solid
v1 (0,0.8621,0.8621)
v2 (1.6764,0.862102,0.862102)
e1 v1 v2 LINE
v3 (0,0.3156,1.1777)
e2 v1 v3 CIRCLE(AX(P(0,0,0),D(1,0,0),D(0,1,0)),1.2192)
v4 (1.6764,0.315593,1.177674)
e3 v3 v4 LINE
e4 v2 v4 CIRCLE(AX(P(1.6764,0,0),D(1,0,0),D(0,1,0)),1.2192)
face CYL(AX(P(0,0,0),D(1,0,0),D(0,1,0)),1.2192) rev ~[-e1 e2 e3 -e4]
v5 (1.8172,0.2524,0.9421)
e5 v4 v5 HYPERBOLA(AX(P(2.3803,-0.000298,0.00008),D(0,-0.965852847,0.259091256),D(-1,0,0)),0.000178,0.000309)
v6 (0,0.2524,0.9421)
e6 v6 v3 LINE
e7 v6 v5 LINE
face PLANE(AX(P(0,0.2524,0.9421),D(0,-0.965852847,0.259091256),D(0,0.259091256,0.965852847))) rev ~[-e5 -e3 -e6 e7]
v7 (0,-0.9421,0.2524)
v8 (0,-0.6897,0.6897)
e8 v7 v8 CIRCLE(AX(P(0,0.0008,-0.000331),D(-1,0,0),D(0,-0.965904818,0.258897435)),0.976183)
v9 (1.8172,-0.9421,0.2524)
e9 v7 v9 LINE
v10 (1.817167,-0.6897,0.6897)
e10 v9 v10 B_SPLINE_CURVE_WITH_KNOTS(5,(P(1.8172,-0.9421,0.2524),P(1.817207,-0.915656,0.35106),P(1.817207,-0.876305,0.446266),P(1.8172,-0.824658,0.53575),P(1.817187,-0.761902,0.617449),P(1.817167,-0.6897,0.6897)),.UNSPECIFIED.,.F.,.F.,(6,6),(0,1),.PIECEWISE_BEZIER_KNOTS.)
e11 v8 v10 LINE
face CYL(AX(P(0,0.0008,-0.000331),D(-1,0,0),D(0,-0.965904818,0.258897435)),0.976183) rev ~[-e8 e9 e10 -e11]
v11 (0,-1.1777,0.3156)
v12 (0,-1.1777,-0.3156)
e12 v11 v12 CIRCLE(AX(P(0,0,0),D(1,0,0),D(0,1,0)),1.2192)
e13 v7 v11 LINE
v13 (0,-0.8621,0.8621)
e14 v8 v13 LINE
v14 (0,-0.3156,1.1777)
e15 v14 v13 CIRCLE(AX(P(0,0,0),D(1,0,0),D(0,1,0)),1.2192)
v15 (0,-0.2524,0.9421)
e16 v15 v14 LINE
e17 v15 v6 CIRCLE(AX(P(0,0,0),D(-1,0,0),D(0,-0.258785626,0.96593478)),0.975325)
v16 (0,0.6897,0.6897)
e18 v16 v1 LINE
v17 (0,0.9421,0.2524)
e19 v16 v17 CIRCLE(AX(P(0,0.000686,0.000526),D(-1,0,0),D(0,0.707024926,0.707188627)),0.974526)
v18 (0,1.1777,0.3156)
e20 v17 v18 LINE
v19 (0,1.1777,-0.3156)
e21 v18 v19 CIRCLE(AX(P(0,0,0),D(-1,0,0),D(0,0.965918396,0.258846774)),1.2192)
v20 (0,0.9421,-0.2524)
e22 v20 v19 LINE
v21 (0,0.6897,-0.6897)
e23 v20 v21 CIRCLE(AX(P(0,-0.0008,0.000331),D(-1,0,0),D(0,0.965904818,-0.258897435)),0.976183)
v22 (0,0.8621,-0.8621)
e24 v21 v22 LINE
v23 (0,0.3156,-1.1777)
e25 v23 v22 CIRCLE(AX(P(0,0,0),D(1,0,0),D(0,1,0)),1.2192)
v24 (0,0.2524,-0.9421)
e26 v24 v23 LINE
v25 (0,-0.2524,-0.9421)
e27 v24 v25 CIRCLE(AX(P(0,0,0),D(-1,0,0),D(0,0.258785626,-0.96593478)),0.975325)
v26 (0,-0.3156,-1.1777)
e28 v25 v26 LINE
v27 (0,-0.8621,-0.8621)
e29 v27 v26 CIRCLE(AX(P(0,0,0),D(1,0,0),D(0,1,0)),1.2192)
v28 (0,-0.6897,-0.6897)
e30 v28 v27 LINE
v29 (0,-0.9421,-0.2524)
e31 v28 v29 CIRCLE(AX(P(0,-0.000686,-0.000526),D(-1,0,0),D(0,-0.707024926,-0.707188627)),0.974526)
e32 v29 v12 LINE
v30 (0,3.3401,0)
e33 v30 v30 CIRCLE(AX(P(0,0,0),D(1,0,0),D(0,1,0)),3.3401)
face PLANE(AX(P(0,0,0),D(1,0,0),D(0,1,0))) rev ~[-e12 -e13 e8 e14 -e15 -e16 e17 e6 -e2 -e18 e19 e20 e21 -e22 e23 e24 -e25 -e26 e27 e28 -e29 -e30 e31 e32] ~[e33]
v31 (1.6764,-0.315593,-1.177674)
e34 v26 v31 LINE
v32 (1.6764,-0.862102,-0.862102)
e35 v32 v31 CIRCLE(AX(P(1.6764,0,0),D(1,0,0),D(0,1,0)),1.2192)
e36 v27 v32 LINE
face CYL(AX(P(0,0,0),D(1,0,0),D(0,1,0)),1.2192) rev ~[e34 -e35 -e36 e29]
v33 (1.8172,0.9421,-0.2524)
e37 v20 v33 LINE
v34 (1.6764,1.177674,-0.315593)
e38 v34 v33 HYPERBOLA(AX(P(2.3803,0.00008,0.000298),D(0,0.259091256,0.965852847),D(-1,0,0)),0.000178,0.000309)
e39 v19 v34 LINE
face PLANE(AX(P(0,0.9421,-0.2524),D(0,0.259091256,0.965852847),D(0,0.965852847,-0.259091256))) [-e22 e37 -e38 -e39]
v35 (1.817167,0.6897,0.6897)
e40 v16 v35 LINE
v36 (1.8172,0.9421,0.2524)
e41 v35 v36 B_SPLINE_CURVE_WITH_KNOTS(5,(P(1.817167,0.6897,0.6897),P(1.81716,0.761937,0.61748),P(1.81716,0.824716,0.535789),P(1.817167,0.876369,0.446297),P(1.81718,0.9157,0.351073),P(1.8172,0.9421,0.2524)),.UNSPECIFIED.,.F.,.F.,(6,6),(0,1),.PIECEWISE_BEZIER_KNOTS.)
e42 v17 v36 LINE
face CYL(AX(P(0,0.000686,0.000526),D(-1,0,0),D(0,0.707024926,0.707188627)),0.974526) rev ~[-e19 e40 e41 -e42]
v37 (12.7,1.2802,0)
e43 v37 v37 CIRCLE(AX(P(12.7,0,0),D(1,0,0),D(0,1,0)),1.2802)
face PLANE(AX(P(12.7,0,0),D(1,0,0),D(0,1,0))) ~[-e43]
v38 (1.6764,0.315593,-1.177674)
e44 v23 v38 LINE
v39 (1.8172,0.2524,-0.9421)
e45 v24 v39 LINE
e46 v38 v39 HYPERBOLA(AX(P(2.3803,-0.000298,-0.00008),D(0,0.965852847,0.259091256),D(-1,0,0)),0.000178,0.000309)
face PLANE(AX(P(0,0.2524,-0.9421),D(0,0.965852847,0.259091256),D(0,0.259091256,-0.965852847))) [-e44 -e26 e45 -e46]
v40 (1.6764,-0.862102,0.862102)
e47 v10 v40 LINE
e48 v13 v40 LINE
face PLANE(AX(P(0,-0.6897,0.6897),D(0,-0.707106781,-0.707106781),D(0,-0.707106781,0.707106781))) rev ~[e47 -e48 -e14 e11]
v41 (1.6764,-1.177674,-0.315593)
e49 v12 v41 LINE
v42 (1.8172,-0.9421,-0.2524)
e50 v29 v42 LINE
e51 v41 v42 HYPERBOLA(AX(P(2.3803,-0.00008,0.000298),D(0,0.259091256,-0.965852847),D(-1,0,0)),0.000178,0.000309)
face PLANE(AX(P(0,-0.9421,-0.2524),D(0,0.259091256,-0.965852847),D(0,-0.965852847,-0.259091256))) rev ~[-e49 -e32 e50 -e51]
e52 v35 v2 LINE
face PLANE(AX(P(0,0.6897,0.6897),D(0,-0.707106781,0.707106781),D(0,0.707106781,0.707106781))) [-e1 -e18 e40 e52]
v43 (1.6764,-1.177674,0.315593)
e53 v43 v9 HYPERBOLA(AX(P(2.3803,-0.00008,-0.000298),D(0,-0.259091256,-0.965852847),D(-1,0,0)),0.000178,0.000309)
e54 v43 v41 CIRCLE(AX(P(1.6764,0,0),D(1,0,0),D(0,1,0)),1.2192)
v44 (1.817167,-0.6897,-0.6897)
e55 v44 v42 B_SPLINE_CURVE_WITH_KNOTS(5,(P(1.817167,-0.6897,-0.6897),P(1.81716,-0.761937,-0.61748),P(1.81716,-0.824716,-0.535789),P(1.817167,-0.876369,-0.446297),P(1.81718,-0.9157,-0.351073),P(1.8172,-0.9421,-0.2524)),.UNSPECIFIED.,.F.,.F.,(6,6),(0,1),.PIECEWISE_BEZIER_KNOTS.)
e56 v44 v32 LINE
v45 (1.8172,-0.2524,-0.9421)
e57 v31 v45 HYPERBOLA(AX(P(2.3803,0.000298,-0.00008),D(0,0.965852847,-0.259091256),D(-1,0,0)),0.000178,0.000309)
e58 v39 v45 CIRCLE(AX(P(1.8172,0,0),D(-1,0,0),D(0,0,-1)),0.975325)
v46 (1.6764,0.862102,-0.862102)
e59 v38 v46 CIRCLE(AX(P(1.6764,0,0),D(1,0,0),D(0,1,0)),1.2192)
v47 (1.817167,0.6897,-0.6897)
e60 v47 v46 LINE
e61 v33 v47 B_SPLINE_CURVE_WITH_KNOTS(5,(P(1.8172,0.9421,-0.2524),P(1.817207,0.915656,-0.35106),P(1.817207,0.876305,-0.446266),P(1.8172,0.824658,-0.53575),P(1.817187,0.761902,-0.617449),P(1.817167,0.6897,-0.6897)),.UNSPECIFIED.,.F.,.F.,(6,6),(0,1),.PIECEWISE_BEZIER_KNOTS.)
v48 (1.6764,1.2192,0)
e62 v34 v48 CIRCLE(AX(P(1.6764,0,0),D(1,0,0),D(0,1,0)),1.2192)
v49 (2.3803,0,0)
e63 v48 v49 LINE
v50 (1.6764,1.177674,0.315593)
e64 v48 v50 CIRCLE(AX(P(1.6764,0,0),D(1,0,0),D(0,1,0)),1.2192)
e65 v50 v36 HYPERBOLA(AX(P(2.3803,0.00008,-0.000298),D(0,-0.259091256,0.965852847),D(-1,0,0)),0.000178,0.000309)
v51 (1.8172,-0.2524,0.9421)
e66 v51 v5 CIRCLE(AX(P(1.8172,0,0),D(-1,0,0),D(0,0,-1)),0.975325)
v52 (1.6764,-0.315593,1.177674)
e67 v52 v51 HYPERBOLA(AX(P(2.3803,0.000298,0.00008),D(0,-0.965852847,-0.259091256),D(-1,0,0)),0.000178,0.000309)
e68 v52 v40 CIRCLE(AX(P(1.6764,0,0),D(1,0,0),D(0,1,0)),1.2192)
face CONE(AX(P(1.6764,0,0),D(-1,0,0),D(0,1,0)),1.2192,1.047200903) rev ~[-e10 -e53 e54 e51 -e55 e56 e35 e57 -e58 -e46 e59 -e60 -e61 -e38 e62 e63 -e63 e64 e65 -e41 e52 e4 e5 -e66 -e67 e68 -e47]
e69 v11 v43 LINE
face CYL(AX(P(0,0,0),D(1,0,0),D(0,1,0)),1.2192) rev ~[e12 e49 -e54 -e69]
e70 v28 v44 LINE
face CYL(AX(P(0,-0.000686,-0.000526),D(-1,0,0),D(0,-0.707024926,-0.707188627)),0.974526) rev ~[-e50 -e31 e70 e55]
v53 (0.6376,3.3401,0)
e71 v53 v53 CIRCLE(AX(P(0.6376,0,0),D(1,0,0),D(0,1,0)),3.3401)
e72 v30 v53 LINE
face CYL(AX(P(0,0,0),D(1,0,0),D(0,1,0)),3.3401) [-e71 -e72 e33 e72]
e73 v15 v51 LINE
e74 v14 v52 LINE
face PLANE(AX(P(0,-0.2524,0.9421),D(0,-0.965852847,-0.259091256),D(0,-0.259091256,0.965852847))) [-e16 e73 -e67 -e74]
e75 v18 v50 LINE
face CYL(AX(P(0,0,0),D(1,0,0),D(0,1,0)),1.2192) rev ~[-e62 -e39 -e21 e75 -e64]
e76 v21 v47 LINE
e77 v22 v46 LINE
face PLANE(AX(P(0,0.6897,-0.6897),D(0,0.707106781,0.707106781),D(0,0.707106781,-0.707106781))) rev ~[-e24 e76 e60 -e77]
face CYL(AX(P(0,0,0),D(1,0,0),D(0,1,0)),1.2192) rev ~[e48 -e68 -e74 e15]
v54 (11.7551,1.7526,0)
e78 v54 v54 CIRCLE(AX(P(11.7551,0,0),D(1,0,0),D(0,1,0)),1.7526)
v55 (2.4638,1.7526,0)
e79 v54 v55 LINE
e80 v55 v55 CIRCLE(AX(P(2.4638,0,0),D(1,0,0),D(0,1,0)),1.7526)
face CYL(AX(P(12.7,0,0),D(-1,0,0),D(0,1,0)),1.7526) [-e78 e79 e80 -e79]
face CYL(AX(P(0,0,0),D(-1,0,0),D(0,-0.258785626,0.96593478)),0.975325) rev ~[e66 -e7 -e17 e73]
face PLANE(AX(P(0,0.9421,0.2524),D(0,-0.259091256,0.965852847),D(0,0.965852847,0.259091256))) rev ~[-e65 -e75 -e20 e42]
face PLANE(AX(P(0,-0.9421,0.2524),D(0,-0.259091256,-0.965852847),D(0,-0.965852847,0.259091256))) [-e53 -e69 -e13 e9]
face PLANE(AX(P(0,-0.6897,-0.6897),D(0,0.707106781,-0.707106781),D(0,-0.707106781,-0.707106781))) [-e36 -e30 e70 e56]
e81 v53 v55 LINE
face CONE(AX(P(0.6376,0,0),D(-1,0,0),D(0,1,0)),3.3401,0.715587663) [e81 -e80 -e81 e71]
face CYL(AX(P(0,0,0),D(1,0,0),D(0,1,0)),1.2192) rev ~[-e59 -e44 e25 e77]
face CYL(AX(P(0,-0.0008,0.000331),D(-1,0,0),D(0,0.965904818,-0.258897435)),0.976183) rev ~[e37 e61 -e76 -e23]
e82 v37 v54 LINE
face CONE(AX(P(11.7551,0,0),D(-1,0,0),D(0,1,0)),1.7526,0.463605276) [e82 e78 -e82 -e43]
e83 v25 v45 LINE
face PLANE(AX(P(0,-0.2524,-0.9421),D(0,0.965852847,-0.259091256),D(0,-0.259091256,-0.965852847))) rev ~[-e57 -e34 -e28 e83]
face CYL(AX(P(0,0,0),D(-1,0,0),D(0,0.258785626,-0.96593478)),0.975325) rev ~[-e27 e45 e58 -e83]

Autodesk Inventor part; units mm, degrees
ref_plane "YZ Plane" through (0, 0, 0) normal (1, 0, 0) x (0, 1, 0)
ref_plane "XZ Plane" through (0, 0, 0) normal (0, 1, 0) x (-1, 0, 0)
sketch "Sketch1" plane through (0, 0, 0) normal (0, 0, 1) x (1, 0, 0)
  line L0 (12.7, 0) -> (12.7, 1.7526)
  line L1 (12.7, 1.7526) -> (2.4638, 1.7526)
  line L2 (0, 3.3401) -> (0, 1.2192)
  line L3 (0, 1.2192) -> (1.6764, 1.2192)
  line L4 (1.6764, 1.2192) -> (2.3803, 0)
  line L5 (2.3803, 0) -> (12.7, 0)
  line L6 (0, 3.3401) -> (0.6376, 3.3401)
  line L7 (0.6376, 3.3401) -> (2.4638, 1.7526)
  line L8 (-2.54, 0) -> (15.24, 0) projected
  line L9 (0, -0.668) -> (0, 4.0081) projected
  dimension "d0" = 12.7
  dimension "d1" = 1.6764
  dimension "d2" = 3.5052
  dimension "d3" = 2.4638
  dimension "d4" = 41
  dimension "d5" = 2.4384
  dimension "d6" = 60
  dimension "d7" = 6.6802
revolve "Body" add sketch "Sketch1" angle 360 about axis through (2.3803, 0, 0) along (1, 0, 0) contours L5 L4 L3 L2 L6 L7 L1 L0
sketch "Sketch2" plane through (0, 0, 0) normal (-1, 0, 0) x (0, 0, 1)
  circle A0 centre (0, 0) radius 3.3401 projected
  circle A1 centre (0, 0) radius 1.2192 projected
  line L0 (0.9421, 0.2524) -> (1.1777, 0.3156)
  line L1 (0.9421, -0.2524) -> (1.1777, -0.3156)
  arc A2 (0.9421, -0.2524) -> (0.9421, 0.2524) centre (0, 0) ccw
  arc A3 (1.1777, -0.3156) -> (1.1777, 0.3156) centre (0, 0) ccw
  line L2 (0, -4.6761) -> (0, 4.6761) projected
  line L3 (-4.6761, 0) -> (4.6761, 0) projected
  line L4 (0.9421, 0.2524) -> (0, 0) construction
  line L5 (0, 0) -> (0.9421, -0.2524) construction
  line L6 (0.2524, 0.9421) -> (0.3156, 1.1777)
  line L7 (0.6897, 0.6897) -> (0.8621, 0.8621)
  arc A4 (0.6897, 0.6897) -> (0.2524, 0.9421) centre (0, 0) ccw
  arc A5 (0.8621, 0.8621) -> (0.3156, 1.1777) centre (0, 0) ccw
  line L8 (-0.6897, 0.6897) -> (-0.8621, 0.8621)
  line L9 (-0.2524, 0.9421) -> (-0.3156, 1.1777)
  arc A6 (-0.2524, 0.9421) -> (-0.6897, 0.6897) centre (0, 0) ccw
  arc A7 (-0.3156, 1.1777) -> (-0.8621, 0.8621) centre (0, 0) ccw
  line L10 (-0.9421, -0.2524) -> (-1.1777, -0.3156)
  line L11 (-0.9421, 0.2524) -> (-1.1777, 0.3156)
  arc A8 (-0.9421, 0.2524) -> (-0.9421, -0.2524) centre (0, 0) ccw
  arc A9 (-1.1777, 0.3156) -> (-1.1777, -0.3156) centre (0, 0) ccw
  line L12 (-0.2524, -0.9421) -> (-0.3156, -1.1777)
  line L13 (-0.6897, -0.6897) -> (-0.8621, -0.8621)
  arc A10 (-0.6897, -0.6897) -> (-0.2524, -0.9421) centre (0, 0) ccw
  arc A11 (-0.8621, -0.8621) -> (-0.3156, -1.1777) centre (0, 0) ccw
  line L14 (0.6897, -0.6897) -> (0.8621, -0.8621)
  line L15 (0.2524, -0.9421) -> (0.3156, -1.1777)
  arc A12 (0.2524, -0.9421) -> (0.6897, -0.6897) centre (0, 0) ccw
  arc A13 (0.3156, -1.1777) -> (0.8621, -0.8621) centre (0, 0) ccw
  dimension "d8" = 1.9507
  dimension "d9" = 2.4384
  dimension "d10" = 15
  dimension "d11" = 15
  dimension "d22" = 360
extrude "Slot" add sketch "Sketch2" against normal up to next contours L3 A2 L0 A1 | A1 L1 A2 L3 | L3 A8 L10 A1 | A1 L11 A8 L3 | A1 L7 A4 L6 | L9 A6 L8 A1 | A1 L13 A10 L12 | L15 A12 L14 A1
thread "Thread" size "6-32 UNC" class "2A" standard "ANSI Unified Screw Threads" length 8.252
chamfer "Chamfer1" distance 0.4724 distance2 0.9449 1 edges at (12.7, -1.7526, 0) measured on face at (12.7, 0.5842, 0.7748)
ref_plane "Work Plane1" through (66.6877, 0, 0) normal (0, 0, -1) x (1, 0, 0)
equation "\"d0\" = NLG"
equation "\"d1\" = INTI"
equation "\"d2\" = GD"
equation "\"d3\" = KOH"
equation "\"d4\" = 0.5 * SEWI"
equation "\"d5\" = SW"
equation "\"d7\" = KOD"
equation "\"d8\" = 0.8 * SW"
equation "\"d9\" = SW"
equation "\"d15\" = GEL"
equation "\"d17\" = -0.5 * SPD + 0.5 * GD"
equation "\"d18\" = GUL"
equation "\"NLG\" = 12.7"
equation "\"SW\" = 2.4384"
equation "\"INTI\" = 1.6764"
equation "\"GEL\" = 8.25195"
equation "\"KOH\" = 2.4638"
equation "\"KOD\" = 6.6802"
equation "\"GUL\" = 0.94488"
equation "\"SPD\" = 2.56032"
equation "\"GD\" = NND"
equation "\"SEWI\" = 82deg"
equation "\"TOA\" = 30deg"
equation "\"GD1\" = SPD"
equation "\"EPV\" = 4.4794"
equation "\"THREADDIA\" = 3.5052"
equation "\"BDM\" = NND"
equation "\"NND\" = 3.5052"
equation "\"GAL\" = 1.9845"
equation "\"E0\" = 1.155 * SW"
properties part number "ANSI B18.3 - 6-32 UNC x 0.5, SSFCHCSI" material "Steel, Mild"
